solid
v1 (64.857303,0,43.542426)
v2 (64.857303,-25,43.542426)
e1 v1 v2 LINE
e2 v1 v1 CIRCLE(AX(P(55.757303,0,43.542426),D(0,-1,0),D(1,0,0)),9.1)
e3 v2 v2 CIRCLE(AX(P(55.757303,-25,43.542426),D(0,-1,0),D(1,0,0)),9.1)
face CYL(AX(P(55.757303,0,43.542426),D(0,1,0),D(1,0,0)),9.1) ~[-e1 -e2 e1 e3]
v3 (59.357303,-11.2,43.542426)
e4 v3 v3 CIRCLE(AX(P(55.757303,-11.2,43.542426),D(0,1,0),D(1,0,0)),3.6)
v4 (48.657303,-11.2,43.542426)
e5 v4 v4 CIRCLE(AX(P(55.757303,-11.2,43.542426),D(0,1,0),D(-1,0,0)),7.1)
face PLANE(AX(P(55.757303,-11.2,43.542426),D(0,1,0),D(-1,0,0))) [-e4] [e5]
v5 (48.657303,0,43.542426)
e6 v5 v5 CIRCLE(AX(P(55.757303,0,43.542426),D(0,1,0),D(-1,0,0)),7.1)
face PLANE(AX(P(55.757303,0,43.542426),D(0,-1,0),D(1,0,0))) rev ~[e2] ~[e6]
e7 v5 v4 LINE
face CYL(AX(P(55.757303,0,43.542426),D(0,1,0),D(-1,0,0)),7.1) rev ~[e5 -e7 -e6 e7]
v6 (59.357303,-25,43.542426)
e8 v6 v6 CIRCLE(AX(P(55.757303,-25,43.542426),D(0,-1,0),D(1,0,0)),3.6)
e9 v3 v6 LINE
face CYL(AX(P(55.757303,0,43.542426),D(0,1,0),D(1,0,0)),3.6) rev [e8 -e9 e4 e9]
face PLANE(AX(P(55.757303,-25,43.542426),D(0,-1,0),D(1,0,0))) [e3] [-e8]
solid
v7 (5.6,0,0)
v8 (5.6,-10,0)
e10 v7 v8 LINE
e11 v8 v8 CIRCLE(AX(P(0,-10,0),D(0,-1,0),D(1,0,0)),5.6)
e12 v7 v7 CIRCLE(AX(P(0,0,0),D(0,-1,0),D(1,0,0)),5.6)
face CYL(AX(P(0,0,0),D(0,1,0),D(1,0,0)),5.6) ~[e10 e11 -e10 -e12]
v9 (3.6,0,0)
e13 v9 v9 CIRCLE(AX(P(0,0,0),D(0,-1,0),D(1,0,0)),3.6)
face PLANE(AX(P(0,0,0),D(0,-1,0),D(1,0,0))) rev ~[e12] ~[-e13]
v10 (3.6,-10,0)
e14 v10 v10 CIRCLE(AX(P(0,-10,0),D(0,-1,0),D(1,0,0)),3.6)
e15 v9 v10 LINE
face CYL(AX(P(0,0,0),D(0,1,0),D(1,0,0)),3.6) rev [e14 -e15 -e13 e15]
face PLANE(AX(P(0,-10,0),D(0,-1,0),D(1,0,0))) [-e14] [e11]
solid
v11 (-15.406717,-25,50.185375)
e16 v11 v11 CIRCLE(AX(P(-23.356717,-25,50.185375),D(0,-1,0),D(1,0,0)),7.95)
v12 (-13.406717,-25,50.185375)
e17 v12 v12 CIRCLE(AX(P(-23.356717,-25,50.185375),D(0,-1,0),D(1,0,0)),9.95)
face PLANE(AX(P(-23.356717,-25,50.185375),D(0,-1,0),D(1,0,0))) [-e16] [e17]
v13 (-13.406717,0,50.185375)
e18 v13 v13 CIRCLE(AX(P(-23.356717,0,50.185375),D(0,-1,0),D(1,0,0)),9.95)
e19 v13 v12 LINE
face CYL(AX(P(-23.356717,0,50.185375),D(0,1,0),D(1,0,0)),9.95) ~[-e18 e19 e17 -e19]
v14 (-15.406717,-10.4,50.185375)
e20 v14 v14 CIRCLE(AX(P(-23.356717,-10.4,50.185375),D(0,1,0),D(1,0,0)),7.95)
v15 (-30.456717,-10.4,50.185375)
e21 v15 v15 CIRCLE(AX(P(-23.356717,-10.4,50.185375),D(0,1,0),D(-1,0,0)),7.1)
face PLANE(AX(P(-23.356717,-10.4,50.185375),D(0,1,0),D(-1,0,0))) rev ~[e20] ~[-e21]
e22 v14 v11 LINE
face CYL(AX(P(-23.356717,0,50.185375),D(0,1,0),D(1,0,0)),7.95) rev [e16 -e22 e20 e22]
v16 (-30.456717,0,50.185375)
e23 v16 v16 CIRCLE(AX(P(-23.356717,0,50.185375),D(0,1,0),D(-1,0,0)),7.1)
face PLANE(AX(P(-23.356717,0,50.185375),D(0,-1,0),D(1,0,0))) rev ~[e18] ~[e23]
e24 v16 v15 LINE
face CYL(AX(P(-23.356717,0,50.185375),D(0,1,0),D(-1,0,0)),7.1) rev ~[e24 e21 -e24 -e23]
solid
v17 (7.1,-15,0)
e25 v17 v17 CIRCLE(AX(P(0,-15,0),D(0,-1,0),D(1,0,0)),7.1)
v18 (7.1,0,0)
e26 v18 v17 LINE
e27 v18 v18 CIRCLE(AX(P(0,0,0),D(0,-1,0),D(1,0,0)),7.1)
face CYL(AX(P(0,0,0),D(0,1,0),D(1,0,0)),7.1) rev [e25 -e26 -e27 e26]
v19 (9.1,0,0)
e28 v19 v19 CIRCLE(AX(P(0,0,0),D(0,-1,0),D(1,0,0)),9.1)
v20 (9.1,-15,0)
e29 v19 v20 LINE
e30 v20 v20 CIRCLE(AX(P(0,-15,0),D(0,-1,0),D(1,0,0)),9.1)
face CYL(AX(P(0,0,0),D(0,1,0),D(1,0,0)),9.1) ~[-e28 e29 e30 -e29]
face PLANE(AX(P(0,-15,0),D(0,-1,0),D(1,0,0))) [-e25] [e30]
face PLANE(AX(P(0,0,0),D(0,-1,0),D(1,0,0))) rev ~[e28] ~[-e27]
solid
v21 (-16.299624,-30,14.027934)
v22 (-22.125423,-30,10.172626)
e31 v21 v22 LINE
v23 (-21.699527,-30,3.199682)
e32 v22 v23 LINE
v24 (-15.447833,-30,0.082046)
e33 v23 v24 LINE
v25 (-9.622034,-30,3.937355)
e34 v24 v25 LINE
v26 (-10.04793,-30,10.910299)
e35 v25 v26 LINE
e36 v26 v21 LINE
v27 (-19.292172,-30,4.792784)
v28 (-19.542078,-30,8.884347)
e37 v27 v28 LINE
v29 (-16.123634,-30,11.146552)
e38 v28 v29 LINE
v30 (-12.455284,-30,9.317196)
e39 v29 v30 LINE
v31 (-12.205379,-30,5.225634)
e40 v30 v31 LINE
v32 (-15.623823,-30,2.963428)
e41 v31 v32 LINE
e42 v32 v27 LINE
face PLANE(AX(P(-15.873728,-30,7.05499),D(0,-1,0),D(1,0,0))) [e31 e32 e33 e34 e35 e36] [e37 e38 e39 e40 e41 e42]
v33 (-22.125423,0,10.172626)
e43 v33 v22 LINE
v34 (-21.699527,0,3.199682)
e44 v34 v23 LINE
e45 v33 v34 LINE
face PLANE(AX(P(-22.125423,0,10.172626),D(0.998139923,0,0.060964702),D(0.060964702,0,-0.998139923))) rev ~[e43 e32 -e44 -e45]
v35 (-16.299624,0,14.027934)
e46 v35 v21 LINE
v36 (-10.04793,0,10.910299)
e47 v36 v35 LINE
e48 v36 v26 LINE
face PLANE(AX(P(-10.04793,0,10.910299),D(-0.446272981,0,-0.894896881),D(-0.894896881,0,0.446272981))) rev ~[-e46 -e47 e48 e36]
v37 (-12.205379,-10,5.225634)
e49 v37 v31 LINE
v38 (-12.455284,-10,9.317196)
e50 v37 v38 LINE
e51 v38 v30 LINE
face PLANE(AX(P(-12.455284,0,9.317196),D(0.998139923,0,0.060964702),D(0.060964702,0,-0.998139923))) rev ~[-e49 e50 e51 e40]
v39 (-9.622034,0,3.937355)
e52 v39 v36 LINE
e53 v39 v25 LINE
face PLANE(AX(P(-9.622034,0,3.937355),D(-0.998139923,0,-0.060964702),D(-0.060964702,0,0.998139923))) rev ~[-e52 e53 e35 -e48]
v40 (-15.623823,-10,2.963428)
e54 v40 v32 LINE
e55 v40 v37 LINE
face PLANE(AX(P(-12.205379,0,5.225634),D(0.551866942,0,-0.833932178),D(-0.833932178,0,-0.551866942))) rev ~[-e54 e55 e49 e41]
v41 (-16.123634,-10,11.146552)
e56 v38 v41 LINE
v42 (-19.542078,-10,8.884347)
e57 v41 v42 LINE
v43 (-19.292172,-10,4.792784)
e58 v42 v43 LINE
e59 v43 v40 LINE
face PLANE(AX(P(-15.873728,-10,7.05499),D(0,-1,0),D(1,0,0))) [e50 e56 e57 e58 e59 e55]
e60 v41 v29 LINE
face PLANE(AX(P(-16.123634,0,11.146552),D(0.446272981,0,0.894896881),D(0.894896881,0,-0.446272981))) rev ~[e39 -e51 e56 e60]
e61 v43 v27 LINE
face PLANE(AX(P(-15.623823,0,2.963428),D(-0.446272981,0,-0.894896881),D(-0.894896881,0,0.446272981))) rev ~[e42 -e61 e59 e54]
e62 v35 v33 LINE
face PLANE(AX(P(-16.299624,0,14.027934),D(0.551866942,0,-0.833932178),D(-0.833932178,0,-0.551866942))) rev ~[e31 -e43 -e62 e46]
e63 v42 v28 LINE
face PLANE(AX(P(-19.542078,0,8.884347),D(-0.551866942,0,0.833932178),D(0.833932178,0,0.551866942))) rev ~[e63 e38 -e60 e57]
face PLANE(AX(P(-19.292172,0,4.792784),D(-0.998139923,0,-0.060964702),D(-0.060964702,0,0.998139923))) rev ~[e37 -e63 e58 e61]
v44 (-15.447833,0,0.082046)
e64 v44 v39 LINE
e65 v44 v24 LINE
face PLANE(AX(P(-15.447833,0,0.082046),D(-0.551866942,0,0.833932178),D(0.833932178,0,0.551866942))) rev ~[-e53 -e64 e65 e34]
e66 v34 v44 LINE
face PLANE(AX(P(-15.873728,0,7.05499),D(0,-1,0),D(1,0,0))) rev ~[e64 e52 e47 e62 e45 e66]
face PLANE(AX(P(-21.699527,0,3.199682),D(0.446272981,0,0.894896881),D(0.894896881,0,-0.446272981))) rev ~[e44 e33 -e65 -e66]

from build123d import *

# Parameters (mm, degrees)
F1_DEPTH  = 30
F2_DEPTH  = 10
F3_R      = 5.6
F3_R_2    = 3.6
F4_DEPTH  = 10
F5_R      = 9.1
F5_R_2    = 7.1
F6_DEPTH  = 15
F7_R      = 9.1
F7_R_2    = 7.1
F7_R_3    = 3.6
F8_DEPTH  = 25
F9_R      = 7.1
F9_R_2    = 3.6
F10_DEPTH = 11.2
F11_R     = 9.95
F11_R_2   = 7.95
F12_DEPTH = 25
F13_R     = 8.00000038
F13_R_2   = 7.1
F14_DEPTH = 10.4


# Not quite as in the source:
# - a feature of the source that left no trace in its solid (it failed there, or was rolled back) is left out


with BuildPart() as f1:
    # F0 (on Front) → F1 (new body)
    with BuildSketch(Plane.XZ):
        Polygon((-22.125422674, 10.1726256458), (-21.6995270296, 3.1996817744), (-15.4478326757, 0.0820462861), (-9.622033966, 3.9373546692), (-10.0479296104, 10.9102985405), (-16.2996239644, 14.0279340289), align=None)
        Polygon((-12.4552844491, 9.3171959029), (-12.2053787404, 5.2256337966), (-15.6238226113, 2.9634280511), (-19.2921721909, 4.7927844121), (-19.5420778996, 8.8843465184), (-16.1236340287, 11.1465522638), align=None, mode=Mode.SUBTRACT)
    extrude(amount=F1_DEPTH)

    # F0 (on Front) → F2 (join)
    with BuildSketch(Plane.XZ):
        Polygon((-15.6238226113, 2.9634280511), (-12.2053787404, 5.2256337966), (-12.4552844491, 9.3171959029), (-16.1236340287, 11.1465522638), (-19.5420778996, 8.8843465184), (-19.2921721909, 4.7927844121), align=None)
    extrude(amount=F2_DEPTH)


with BuildPart() as f4:
    # F3 (on Front) → F4 (new body)
    with BuildSketch(Plane.XZ):
        Circle(F3_R)
        Circle(F3_R_2, mode=Mode.SUBTRACT)
    extrude(amount=F4_DEPTH)


with BuildPart() as f6:
    # F5 (on Front) → F6 (new body)
    with BuildSketch(Plane.XZ):
        Circle(F5_R)
        Circle(F5_R_2, mode=Mode.SUBTRACT)
    extrude(amount=F6_DEPTH)


with BuildPart() as f8:
    # F7 (on Front) → F8 (new body)
    with BuildSketch(Plane.XZ):
        with Locations((55.7573027909, 43.5424260795)):
            Circle(F7_R)
        with Locations((55.7573027909, 43.5424260795)):
            Circle(F7_R_2, mode=Mode.SUBTRACT)
        with Locations((55.7573027909, 43.5424260795)):
            Circle(F7_R_2)
        with Locations((55.7573027909, 43.5424260795)):
            Circle(F7_R_3, mode=Mode.SUBTRACT)
    extrude(amount=F8_DEPTH)

    # F9 (on face) → F10 (cut)
    with BuildSketch(Plane(origin=(0, 0, 0), x_dir=(-1, 0, 0), z_dir=(0, 1, 0))):
        with Locations((-55.7573027909, 43.5424260795)):
            Circle(F9_R)
        with Locations((-55.7573027909, 43.5424260795)):
            Circle(F9_R_2, mode=Mode.SUBTRACT)
    extrude(amount=-F10_DEPTH, mode=Mode.SUBTRACT)


with BuildPart() as f12:
    # F11 (on Front) → F12 (new body)
    with BuildSketch(Plane.XZ):
        with Locations((-23.3567170799, 50.1853749156)):
            Circle(F11_R)
        with Locations((-23.3567170799, 50.1853749156)):
            Circle(F11_R_2, mode=Mode.SUBTRACT)
    extrude(amount=F12_DEPTH)

    # F13 (on face) → F14 (join)
    with BuildSketch(Plane(origin=(0, 0, 0), x_dir=(-1, 0, 0), z_dir=(0, 1, 0))):
        with Locations((23.3567170799, 50.1853749156)):
            Circle(F13_R)
        with Locations((23.3567170799, 50.1853749156)):
            Circle(F13_R_2, mode=Mode.SUBTRACT)
    extrude(amount=-F14_DEPTH)


solid = Compound([f1.part, f4.part, f6.part, f8.part, f12.part])
